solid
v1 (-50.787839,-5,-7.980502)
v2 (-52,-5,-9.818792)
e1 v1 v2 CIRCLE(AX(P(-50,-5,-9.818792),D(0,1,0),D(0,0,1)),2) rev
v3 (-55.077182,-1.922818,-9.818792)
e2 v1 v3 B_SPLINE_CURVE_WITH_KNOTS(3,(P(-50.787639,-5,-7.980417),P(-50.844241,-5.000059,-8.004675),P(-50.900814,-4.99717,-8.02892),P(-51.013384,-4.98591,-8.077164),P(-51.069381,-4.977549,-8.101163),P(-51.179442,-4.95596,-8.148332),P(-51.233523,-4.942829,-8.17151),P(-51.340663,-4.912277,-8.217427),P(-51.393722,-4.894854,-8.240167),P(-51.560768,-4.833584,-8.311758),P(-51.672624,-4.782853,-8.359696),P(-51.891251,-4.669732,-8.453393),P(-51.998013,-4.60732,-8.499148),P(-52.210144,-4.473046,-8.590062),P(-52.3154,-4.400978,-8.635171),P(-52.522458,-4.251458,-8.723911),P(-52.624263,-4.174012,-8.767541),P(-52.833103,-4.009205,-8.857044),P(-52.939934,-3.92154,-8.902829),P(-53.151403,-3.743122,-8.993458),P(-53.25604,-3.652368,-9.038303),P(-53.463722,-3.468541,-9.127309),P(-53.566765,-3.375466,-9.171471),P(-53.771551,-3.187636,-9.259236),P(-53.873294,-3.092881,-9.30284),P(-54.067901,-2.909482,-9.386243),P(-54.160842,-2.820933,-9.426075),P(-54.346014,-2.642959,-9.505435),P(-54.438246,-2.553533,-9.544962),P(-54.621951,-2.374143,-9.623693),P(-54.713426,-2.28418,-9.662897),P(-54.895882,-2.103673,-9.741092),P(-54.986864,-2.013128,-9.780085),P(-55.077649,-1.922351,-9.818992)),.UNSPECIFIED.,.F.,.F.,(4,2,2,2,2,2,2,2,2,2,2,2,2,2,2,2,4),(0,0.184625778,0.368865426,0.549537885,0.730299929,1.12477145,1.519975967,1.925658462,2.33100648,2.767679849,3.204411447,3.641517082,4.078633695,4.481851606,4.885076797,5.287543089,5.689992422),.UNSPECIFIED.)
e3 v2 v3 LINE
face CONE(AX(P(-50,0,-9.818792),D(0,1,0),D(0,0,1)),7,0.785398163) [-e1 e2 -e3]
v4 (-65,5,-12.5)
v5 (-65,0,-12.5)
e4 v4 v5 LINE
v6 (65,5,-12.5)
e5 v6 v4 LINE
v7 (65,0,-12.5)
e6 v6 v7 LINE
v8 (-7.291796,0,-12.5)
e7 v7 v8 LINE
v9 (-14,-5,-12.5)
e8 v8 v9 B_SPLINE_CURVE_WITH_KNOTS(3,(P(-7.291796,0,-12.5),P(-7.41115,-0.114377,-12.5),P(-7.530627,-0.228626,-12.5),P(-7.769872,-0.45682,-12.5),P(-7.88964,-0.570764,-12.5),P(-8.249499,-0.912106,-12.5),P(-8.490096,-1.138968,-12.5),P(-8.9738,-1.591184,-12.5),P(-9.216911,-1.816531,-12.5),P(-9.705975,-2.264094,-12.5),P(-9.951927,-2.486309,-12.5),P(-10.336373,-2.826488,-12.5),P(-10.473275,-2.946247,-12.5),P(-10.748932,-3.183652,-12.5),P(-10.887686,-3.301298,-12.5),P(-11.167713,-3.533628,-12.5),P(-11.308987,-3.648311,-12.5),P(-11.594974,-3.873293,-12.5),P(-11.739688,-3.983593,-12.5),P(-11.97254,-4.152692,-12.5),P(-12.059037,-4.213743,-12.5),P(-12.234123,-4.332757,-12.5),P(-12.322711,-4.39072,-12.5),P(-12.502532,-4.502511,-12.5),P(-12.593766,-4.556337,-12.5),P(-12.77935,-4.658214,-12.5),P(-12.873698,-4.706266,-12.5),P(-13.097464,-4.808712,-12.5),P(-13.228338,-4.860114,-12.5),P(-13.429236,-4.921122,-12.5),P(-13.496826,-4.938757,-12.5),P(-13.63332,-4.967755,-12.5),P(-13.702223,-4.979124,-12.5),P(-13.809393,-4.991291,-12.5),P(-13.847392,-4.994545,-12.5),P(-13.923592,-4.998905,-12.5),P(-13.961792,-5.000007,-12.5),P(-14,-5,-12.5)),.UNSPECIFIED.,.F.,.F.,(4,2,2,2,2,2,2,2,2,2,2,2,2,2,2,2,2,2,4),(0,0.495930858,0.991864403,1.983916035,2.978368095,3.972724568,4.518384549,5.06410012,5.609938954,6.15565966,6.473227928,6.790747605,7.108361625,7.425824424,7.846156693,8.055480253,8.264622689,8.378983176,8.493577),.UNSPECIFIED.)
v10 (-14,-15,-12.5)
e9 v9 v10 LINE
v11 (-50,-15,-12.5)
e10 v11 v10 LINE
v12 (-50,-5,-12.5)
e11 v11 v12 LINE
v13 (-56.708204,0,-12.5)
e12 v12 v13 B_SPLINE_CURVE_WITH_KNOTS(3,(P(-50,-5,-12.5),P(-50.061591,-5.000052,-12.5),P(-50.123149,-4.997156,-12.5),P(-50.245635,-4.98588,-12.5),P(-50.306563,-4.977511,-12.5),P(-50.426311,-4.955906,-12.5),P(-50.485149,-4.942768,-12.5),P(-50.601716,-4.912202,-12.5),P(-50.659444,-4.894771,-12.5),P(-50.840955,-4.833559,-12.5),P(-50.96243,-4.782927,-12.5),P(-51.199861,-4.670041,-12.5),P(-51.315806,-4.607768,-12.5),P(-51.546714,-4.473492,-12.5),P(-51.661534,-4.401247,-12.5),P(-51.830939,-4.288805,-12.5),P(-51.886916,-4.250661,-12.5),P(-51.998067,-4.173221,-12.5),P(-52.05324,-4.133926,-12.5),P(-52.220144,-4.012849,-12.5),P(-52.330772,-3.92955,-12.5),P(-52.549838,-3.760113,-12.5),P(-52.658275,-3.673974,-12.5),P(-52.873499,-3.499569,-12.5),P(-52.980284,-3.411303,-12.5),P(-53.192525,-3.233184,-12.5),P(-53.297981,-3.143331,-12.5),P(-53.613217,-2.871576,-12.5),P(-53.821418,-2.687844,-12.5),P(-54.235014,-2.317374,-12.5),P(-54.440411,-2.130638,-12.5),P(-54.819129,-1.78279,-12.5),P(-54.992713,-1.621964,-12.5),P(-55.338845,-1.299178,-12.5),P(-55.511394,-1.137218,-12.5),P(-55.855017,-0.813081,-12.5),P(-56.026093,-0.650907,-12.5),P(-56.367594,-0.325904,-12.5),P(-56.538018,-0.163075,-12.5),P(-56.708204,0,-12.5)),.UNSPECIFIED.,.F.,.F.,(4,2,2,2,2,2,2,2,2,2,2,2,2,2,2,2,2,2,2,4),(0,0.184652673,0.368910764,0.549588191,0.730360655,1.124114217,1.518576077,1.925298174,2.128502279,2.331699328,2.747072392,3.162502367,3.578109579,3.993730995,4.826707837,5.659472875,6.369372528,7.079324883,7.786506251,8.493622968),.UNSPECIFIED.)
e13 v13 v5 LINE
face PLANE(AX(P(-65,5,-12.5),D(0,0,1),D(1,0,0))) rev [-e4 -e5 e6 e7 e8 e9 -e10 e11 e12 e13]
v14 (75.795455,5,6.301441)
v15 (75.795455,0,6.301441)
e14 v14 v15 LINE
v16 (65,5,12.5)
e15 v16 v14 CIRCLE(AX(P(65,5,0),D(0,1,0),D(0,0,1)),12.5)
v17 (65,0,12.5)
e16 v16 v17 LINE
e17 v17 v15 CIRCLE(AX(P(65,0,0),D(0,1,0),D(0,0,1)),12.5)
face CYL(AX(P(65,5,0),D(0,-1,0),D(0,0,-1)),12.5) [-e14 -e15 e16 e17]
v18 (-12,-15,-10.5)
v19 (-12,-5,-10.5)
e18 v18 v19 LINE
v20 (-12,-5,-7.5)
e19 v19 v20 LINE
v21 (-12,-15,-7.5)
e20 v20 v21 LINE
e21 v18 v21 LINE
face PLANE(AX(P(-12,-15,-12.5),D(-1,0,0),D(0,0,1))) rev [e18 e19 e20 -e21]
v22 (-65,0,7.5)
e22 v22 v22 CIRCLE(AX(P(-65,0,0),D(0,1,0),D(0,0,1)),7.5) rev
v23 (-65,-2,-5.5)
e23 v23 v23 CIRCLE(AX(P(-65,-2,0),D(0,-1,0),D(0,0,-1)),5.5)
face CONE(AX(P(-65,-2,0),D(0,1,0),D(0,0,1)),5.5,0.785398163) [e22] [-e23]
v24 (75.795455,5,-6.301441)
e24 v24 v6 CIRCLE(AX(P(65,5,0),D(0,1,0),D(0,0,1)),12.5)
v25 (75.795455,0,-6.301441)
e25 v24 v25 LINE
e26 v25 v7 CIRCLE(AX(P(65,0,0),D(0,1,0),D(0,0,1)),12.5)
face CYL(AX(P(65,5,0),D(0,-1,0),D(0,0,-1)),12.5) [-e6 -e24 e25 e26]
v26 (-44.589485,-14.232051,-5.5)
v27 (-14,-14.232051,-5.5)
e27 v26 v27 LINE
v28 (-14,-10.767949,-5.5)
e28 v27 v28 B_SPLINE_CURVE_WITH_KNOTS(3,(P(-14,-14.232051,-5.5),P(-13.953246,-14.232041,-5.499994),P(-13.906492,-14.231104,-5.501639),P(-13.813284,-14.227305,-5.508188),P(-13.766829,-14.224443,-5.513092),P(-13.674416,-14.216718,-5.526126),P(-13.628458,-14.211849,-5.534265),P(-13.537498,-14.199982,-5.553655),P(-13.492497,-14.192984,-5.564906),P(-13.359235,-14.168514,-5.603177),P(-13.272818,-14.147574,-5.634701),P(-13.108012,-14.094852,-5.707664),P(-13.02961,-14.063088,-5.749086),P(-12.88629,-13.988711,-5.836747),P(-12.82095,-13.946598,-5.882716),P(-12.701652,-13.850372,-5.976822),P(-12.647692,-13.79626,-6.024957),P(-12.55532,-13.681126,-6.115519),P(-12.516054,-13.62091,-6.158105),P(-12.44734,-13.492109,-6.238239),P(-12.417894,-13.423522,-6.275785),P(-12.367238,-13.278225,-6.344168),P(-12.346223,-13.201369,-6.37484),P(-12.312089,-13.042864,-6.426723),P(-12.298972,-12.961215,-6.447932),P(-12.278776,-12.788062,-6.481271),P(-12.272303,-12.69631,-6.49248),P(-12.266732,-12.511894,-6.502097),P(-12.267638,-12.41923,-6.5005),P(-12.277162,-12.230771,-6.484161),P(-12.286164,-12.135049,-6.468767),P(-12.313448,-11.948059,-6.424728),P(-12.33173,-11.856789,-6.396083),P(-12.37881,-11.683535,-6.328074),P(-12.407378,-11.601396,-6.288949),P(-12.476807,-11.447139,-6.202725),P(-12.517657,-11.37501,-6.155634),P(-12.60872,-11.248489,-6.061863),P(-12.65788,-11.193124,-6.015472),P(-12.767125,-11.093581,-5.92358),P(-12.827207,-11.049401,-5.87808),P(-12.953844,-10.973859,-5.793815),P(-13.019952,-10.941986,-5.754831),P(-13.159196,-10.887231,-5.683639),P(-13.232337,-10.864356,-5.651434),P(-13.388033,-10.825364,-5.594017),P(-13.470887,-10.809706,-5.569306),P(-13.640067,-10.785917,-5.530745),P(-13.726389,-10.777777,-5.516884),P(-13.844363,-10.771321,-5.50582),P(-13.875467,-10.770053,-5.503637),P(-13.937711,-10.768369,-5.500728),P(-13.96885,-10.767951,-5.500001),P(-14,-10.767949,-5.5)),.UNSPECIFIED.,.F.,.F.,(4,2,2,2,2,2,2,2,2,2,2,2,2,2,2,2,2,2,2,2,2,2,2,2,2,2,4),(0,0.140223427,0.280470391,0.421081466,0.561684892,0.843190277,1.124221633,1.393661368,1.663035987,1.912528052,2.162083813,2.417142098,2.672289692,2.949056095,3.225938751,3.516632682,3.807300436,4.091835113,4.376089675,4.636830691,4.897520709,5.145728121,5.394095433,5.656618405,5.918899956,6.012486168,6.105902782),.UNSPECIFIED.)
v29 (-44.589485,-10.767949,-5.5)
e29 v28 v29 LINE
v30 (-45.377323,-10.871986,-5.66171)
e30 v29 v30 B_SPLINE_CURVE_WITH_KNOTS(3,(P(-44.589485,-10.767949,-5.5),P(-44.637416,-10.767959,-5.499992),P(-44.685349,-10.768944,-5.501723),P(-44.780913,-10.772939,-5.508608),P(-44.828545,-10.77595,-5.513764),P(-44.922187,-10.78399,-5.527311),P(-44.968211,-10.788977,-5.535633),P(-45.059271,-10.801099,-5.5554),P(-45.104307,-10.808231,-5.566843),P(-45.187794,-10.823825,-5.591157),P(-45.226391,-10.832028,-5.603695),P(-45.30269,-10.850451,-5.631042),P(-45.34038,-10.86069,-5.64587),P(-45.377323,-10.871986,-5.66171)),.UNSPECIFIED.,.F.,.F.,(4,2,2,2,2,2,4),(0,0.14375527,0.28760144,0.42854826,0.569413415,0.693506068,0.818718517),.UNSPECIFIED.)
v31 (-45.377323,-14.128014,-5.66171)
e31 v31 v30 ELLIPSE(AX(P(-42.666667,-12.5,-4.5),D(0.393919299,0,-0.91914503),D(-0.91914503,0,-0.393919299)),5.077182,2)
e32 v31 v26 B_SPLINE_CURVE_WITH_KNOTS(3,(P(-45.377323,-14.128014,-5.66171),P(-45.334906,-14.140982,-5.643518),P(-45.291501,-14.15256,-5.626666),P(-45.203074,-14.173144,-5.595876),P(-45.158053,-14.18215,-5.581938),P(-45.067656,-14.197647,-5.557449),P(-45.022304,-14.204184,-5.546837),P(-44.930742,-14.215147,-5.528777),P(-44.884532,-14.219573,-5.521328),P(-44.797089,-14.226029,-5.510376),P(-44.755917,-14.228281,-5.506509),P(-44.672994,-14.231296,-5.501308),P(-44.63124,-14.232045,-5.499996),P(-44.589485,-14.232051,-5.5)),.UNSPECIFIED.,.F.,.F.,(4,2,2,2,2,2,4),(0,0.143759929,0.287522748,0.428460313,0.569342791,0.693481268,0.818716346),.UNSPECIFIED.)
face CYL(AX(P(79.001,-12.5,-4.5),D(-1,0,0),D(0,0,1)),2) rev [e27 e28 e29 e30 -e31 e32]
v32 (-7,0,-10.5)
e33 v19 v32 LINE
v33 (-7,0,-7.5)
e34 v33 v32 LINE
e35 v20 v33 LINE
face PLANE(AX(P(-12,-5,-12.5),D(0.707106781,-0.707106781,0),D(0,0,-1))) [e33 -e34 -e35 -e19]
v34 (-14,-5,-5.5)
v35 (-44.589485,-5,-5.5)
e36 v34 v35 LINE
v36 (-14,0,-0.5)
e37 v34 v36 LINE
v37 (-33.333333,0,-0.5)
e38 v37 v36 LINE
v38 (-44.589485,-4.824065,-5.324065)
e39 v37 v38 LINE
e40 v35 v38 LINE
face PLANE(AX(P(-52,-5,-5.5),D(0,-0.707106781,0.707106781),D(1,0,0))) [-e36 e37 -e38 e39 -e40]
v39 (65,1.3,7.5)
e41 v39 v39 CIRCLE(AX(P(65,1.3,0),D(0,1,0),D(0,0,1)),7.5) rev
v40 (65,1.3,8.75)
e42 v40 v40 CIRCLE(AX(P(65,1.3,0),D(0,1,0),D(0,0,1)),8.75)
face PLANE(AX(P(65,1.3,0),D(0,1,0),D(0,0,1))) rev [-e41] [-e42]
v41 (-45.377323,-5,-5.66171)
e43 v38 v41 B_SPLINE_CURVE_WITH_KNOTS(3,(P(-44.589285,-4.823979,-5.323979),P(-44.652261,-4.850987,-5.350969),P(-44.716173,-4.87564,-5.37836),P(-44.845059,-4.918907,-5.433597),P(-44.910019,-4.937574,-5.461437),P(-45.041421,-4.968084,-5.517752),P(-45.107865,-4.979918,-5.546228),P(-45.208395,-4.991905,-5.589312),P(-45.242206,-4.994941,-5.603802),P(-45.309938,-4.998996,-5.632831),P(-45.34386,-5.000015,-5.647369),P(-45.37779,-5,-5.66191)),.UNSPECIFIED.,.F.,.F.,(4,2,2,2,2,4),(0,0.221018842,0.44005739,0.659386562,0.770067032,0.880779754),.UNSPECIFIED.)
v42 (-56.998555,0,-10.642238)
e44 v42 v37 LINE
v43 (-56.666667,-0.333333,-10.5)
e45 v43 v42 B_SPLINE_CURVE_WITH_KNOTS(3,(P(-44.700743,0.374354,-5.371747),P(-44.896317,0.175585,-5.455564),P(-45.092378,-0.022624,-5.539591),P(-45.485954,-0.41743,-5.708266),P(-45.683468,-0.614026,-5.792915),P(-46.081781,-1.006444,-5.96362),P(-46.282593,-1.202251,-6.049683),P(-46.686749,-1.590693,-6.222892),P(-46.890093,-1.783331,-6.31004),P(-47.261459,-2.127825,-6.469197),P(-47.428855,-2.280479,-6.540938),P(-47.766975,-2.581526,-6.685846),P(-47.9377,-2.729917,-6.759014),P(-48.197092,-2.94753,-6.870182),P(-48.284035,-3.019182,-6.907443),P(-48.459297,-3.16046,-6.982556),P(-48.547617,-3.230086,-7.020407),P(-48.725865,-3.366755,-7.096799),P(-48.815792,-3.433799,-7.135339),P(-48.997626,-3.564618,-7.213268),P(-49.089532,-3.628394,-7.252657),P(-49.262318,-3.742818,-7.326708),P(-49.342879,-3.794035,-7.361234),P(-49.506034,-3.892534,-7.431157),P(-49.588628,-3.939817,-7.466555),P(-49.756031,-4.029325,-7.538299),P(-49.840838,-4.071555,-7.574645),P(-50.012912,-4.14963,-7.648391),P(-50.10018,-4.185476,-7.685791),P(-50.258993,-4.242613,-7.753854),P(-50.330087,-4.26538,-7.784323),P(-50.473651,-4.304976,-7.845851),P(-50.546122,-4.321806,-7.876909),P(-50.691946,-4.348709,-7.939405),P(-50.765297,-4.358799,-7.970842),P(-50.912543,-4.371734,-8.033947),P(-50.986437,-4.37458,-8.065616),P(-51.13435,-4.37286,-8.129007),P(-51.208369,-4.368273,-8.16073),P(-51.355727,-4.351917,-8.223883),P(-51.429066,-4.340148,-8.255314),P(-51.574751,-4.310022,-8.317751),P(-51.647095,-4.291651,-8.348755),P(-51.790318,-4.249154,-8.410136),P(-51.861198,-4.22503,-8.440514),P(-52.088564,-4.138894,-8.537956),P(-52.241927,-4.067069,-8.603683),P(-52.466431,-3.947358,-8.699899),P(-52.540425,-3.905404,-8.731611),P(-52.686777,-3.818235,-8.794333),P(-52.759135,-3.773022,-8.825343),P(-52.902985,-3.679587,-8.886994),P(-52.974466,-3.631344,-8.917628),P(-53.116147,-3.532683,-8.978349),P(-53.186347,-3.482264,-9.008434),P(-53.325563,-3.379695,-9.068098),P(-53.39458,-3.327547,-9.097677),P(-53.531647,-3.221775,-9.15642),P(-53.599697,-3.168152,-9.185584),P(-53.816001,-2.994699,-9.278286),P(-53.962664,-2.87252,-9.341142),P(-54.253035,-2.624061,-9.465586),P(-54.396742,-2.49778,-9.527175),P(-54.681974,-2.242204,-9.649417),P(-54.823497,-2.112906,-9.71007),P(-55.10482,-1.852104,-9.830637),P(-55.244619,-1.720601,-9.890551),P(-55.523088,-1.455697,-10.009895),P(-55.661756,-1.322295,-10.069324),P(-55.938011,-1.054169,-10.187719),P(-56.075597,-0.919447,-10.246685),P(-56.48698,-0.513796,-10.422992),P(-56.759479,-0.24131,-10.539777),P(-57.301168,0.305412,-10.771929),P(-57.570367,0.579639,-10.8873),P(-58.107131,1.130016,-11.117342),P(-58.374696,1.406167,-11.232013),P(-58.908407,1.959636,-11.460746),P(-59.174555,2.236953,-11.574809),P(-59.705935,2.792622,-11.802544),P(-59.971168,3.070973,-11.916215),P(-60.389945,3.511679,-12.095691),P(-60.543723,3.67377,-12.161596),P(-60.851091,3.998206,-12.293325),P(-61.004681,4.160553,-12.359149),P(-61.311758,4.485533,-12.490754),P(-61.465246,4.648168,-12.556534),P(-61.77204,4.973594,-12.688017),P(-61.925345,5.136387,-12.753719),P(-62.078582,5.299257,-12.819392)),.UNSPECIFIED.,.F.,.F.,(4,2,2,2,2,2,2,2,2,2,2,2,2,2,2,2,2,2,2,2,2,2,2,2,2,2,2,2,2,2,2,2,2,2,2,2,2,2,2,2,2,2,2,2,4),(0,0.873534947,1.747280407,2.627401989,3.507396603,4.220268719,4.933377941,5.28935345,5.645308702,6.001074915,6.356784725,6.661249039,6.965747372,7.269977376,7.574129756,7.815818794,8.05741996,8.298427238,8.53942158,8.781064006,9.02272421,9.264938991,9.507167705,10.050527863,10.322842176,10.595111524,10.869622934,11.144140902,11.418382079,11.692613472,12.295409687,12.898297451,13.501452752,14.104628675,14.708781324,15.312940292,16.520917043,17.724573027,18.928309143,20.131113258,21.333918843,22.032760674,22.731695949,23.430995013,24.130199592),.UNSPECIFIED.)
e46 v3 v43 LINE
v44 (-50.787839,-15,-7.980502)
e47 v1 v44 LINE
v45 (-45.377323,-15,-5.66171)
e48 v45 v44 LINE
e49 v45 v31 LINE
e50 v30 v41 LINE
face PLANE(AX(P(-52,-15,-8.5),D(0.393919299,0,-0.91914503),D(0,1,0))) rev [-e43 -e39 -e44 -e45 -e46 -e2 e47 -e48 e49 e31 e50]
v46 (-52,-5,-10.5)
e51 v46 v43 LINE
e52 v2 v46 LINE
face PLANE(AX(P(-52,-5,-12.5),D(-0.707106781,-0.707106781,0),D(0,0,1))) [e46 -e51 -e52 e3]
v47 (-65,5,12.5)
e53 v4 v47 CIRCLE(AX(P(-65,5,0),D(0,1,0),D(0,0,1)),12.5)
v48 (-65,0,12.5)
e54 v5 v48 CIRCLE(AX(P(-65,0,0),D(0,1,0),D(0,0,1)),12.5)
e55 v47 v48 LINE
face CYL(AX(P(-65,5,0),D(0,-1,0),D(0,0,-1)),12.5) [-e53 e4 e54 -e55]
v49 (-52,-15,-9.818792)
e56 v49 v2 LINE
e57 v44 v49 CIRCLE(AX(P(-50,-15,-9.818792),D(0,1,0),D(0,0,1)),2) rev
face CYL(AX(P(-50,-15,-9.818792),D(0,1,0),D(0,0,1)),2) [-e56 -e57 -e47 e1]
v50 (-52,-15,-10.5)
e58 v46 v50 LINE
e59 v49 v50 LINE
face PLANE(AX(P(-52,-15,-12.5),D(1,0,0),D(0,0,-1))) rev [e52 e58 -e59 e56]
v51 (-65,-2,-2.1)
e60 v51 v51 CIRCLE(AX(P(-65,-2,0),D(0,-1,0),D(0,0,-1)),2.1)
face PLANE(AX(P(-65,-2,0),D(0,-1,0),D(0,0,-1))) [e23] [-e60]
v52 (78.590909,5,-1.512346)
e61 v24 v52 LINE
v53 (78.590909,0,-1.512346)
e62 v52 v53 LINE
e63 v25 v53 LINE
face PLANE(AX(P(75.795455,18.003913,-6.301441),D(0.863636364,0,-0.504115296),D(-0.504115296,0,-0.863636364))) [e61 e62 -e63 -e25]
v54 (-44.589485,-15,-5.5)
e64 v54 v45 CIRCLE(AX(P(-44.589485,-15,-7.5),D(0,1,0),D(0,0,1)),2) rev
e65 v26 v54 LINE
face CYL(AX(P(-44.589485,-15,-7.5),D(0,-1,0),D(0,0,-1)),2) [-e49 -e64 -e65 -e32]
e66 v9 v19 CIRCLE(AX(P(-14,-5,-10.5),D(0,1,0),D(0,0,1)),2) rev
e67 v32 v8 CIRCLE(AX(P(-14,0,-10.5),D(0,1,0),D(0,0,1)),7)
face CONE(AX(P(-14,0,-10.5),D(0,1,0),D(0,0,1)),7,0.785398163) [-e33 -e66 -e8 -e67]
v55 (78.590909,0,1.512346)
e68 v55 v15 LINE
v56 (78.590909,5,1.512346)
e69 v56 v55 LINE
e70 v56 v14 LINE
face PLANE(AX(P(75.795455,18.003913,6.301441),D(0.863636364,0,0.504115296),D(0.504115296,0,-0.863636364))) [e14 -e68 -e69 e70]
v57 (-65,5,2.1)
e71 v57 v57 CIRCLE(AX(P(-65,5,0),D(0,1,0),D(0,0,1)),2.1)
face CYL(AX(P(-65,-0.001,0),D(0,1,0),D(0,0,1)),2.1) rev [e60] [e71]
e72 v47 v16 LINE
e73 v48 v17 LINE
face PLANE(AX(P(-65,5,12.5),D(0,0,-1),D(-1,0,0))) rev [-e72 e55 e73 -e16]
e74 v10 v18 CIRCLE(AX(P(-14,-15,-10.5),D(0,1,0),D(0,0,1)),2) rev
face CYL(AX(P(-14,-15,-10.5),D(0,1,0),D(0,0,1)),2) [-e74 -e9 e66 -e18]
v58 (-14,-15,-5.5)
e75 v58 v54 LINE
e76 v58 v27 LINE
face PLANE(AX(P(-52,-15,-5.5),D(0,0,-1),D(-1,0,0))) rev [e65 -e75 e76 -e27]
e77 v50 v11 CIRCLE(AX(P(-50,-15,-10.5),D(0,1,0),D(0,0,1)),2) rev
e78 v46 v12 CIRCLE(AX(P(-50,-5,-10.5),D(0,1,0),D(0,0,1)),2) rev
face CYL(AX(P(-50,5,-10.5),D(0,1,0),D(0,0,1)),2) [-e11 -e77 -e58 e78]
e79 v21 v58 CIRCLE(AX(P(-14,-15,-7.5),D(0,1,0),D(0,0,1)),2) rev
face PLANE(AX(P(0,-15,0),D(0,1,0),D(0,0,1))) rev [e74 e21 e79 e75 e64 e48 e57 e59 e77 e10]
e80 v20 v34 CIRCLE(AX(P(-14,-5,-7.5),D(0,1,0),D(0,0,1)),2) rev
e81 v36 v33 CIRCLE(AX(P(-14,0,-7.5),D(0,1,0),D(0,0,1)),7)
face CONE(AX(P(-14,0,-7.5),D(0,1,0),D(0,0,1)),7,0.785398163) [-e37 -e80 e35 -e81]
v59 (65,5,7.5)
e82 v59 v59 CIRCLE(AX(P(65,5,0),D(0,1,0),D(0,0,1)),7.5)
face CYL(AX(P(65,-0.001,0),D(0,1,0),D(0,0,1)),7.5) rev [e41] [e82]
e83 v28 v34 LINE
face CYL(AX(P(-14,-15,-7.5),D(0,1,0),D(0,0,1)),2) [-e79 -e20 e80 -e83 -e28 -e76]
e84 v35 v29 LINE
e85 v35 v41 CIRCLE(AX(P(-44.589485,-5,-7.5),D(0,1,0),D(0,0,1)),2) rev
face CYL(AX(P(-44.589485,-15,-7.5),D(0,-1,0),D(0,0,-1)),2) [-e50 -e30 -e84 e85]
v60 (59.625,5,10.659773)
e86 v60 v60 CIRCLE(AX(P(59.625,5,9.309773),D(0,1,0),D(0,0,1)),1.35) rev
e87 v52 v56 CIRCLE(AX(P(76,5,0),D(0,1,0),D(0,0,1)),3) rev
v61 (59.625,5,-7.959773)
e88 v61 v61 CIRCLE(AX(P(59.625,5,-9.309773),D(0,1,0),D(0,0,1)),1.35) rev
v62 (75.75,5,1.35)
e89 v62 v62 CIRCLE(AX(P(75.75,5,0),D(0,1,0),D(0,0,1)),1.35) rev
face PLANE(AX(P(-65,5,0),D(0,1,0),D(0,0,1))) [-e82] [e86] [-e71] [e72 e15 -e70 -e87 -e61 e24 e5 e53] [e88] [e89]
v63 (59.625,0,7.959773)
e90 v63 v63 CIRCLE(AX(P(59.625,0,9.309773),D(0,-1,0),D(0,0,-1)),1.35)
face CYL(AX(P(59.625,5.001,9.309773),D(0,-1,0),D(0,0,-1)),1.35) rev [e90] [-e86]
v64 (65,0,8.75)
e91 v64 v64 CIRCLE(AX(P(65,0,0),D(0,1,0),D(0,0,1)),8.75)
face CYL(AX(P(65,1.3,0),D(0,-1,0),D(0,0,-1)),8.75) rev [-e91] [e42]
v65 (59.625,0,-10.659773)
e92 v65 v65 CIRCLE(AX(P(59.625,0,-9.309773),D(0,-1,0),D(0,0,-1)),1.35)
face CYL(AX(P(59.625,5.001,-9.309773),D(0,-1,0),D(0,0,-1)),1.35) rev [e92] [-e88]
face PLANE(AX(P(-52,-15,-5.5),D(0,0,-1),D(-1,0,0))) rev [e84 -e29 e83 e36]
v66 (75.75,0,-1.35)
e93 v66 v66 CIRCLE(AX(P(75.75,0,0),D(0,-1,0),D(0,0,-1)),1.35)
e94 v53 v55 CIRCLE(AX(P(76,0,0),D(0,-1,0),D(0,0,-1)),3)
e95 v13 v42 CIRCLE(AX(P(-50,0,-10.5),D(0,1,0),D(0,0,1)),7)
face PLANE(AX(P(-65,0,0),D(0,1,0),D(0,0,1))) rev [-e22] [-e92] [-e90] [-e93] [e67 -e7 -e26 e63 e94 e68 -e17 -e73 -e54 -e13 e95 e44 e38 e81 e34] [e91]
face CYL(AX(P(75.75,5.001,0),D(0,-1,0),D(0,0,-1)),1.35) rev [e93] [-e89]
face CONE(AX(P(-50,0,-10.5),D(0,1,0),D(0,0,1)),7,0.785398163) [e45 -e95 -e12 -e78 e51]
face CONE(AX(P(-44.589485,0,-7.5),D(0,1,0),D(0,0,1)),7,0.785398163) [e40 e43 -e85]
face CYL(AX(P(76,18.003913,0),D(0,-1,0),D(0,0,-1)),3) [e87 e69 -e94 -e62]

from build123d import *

# Parameters (mm, degrees)
EXTRUDE_1_DEPTH     = 5
EXTRUDE_5_DEPTH     = 5
CUT_EXTRUDE_2_REACH = 82.139
SKETCH_7_R          = 7.5
SKETCH_8_R          = 8.75
CUT_EXTRUDE_3_DEPTH = 1.3
CUT_EXTRUDE_4_REACH = 82.139
SKETCH_9_R          = 1.35
CUT_EXTRUDE_5_REACH = 82.139
SKETCH_12_R         = 2.1
SKETCH_14_W         = 40
SKETCH_14_H         = 7
EXTRUDE_6_DEPTH     = 15
CHAMFER_1_SIZE      = 7
CHAMFER_1_SIZE2     = 3
CUT_EXTRUDE_6_REACH = 134.447
SKETCH_15_R         = 2
FILLET_3_R          = 2
CHAMFER_2_SIZE      = 5
CUT_EXTRUDE_7_DEPTH = 15
SKETCH_17_R         = 7.5
SKETCH_17_R_2       = 2.1
EXTRUDE_7_DEPTH     = 2
CHAMFER_3_SIZE      = 2


# Some blends are built 0.0001 mm under size
with BuildPart() as part:
    # 草图1 → 凸台-拉伸1 (new body)
    with BuildSketch(Plane(origin=(0, 0, 0), x_dir=(1, 0, 0), z_dir=(0, 1, 0))):
        with BuildLine():
            Line((-65, 12.5), (65, 12.5))
            ThreePointArc((65, 12.5), (77.5, 0), (65, -12.5))
            Line((65, -12.5), (-65, -12.5))
            ThreePointArc((-65, -12.5), (-77.5, 0), (-65, 12.5))
        make_face()
    extrude(amount=EXTRUDE_1_DEPTH)

    # 草图10 → 凸台-拉伸5 (add)
    with BuildSketch(Plane.XZ):
        with BuildLine():
            Line((75.795454545, -6.301441197), (78.590909091, -1.512345887))
            ThreePointArc((78.590909091, -1.512345887), (79, 0), (78.590909091, 1.512345887))
            Line((78.590909091, 1.512345887), (75.795454545, 6.301441197))
            Line((75.795454545, 6.301441197), (75.795454545, -6.301441197))
        make_face()
    extrude(amount=-EXTRUDE_5_DEPTH)

    # 草图7 → 切除-拉伸2 (cut, up to next)
    with BuildSketch(Plane(origin=(0, 5, 0), x_dir=(1, 0, 0), z_dir=(0, 1, 0)), mode=Mode.PRIVATE) as cut_extrude_2_sk1:
        with Locations(Location((65, 0, 0), (0, 0, 270))):
            Circle(SKETCH_7_R)
    cut_extrude_2_tool1 = extrude(cut_extrude_2_sk1.sketch, amount=-CUT_EXTRUDE_2_REACH, mode=Mode.PRIVATE) & part.part
    add(cut_extrude_2_tool1.solids().sort_by_distance((65, 5, 0))[0], mode=Mode.SUBTRACT)

    # 草图8 → 切除-拉伸3 (cut)
    with BuildSketch(Plane(origin=(0, 0, 0), x_dir=(1, 0, 0), z_dir=(0, 1, 0))):
        with Locations(Location((65, 0, 0), (0, 0, 270))):
            Circle(SKETCH_8_R)
    extrude(amount=CUT_EXTRUDE_3_DEPTH, mode=Mode.SUBTRACT)

    # 草图9 → 切除-拉伸4 (cut, up to next)
    with BuildSketch(Plane.XZ, mode=Mode.PRIVATE) as cut_extrude_4_sk1:
        with Locations(Location((59.625, 9.309773091, 0), (0, 0, 270))):
            Circle(SKETCH_9_R)
    cut_extrude_4_tool1 = extrude(cut_extrude_4_sk1.sketch, amount=-CUT_EXTRUDE_4_REACH, mode=Mode.PRIVATE) & part.part
    # 草图9 → 切除-拉伸4 (cut, up to next)
    with BuildSketch(Plane.XZ, mode=Mode.PRIVATE) as cut_extrude_4_sk2:
        with Locations(Location((75.75, 0, 0), (0, 0, 270))):
            Circle(SKETCH_9_R)
    cut_extrude_4_tool2 = extrude(cut_extrude_4_sk2.sketch, amount=-CUT_EXTRUDE_4_REACH, mode=Mode.PRIVATE) & part.part
    # 草图9 → 切除-拉伸4 (cut, up to next)
    with BuildSketch(Plane.XZ, mode=Mode.PRIVATE) as cut_extrude_4_sk3:
        with Locations(Location((59.625, -9.309773091, 0), (0, 0, 270))):
            Circle(SKETCH_9_R)
    cut_extrude_4_tool3 = extrude(cut_extrude_4_sk3.sketch, amount=-CUT_EXTRUDE_4_REACH, mode=Mode.PRIVATE) & part.part
    add(cut_extrude_4_tool1.solids().sort_by_distance((59.625, 0, 9.309773))[0], mode=Mode.SUBTRACT)
    add(cut_extrude_4_tool2.solids().sort_by_distance((75.75, 0, 0))[0], mode=Mode.SUBTRACT)
    add(cut_extrude_4_tool3.solids().sort_by_distance((59.625, 0, -9.309773))[0], mode=Mode.SUBTRACT)

    # 草图12 → 切除-拉伸5 (cut, up to next)
    with BuildSketch(Plane(origin=(0, 5, 0), x_dir=(1, 0, 0), z_dir=(0, 1, 0)), mode=Mode.PRIVATE) as cut_extrude_5_sk1:
        with Locations(Location((-65, 0, 0), (0, 0, 270))):
            Circle(SKETCH_12_R)
    cut_extrude_5_tool1 = extrude(cut_extrude_5_sk1.sketch, amount=-CUT_EXTRUDE_5_REACH, mode=Mode.PRIVATE) & part.part
    add(cut_extrude_5_tool1.solids().sort_by_distance((-65, 5, 0))[0], mode=Mode.SUBTRACT)

    # 草图14 → 凸台-拉伸6 (add)
    with BuildSketch(Plane.XZ):
        with Locations((-32, -9)):
            Rectangle(SKETCH_14_W, SKETCH_14_H)
    extrude(amount=EXTRUDE_6_DEPTH)

    # 倒角1
    chamfer_1_edges = [part.edges().sort_by_distance(p)[0] for p in [
        (-52, -7.5, -5.5),
    ]]
    chamfer_1_side = [part.faces().sort_by_distance(p)[0] for p in [
        (-32, -7.5, -5.5),
    ]]
    chamfer(chamfer_1_edges, length=CHAMFER_1_SIZE, length2=CHAMFER_1_SIZE2, reference=chamfer_1_side[0])

    # 草图15 → 切除-拉伸6 (cut, up to next)
    with BuildSketch(Plane.ZY.offset(52), mode=Mode.PRIVATE) as cut_extrude_6_sk1:
        with Locations((-4.5, -12.5)):
            Circle(SKETCH_15_R)
    cut_extrude_6_tool1 = extrude(cut_extrude_6_sk1.sketch, amount=-CUT_EXTRUDE_6_REACH, mode=Mode.PRIVATE) & part.part
    add(cut_extrude_6_tool1.solids().sort_by_distance((-52, -12.5, -4.5))[0], mode=Mode.SUBTRACT)

    # 圆角3
    # the kernel refuses this fillet: 2 mm, written as the material it takes off along each edge
    with BuildSketch(Plane(origin=(-52, 0, -8.5), x_dir=(0.9191450300180579, 0, 0.39391929857916774), z_dir=(0, -1, 0))) as fillet_3_piece_1:
        with BuildLine():
            CenterArc((FILLET_3_R * 0.659396157981, -FILLET_3_R), FILLET_3_R, 90, 66.801409486)
            Line((-FILLET_3_R * 0.259748872037, -FILLET_3_R * 0.606080701421), (0, 0))
            Line((0, 0), (FILLET_3_R * 0.659396157981, 0))
        make_face()
    extrude(amount=18.29698079, mode=Mode.SUBTRACT)
    with BuildSketch(Plane(origin=(-52, 0, -12.5), x_dir=(0, 0, 1), z_dir=(0, -1, 0))) as fillet_3_piece_2:
        with BuildLine():
            CenterArc((FILLET_3_R, -FILLET_3_R), FILLET_3_R, 90, 90)
            Line((0, -FILLET_3_R), (0, 0))
            Line((0, 0), (FILLET_3_R, 0))
        make_face()
    extrude(amount=20, mode=Mode.SUBTRACT)
    with BuildSketch(Plane(origin=(-45, -13.205762298, -5.5), x_dir=(-0.9191450300180575, 0, -0.3939192985791687), z_dir=(0, -1, 0))) as fillet_3_piece_3:
        with BuildLine():
            CenterArc((FILLET_3_R * 0.205257701955, FILLET_3_R), FILLET_3_R, 246.801409486, 23.198590514)
            Line((-FILLET_3_R * 0.188661596625, FILLET_3_R * 0.0808549699819), (0, 0))
            Line((0, 0), (FILLET_3_R * 0.205257701955, 0))
        make_face()
    extrude(amount=2.820526212, mode=Mode.SUBTRACT)
    with BuildSketch(Plane(origin=(-45, 0, -5.5), x_dir=(1, 0, 0), z_dir=(0, -1, 0))) as fillet_3_piece_4:
        with BuildLine():
            CenterArc((FILLET_3_R * 0.205257701955, -FILLET_3_R), FILLET_3_R, 90, 23.198590514)
            Line((-FILLET_3_R * 0.188661596625, -FILLET_3_R * 0.0808549699819), (0, 0))
            Line((0, 0), (FILLET_3_R * 0.205257701955, 0))
        make_face()
    extrude(amount=11.794237702, mode=Mode.SUBTRACT)
    with BuildSketch(Plane(origin=(-12, 0, -5.5), x_dir=(-1, 0, 0), z_dir=(0, -1, 0))) as fillet_3_piece_5:
        with BuildLine():
            CenterArc((FILLET_3_R, FILLET_3_R), FILLET_3_R, 180, 90)
            Line((0, FILLET_3_R), (0, 0))
            Line((0, 0), (FILLET_3_R, 0))
        make_face()
    extrude(amount=15.767949192, mode=Mode.SUBTRACT)
    with BuildSketch(Plane(origin=(-12, -9.232050808, -5.5), x_dir=(0, 0, -1), z_dir=(0, -1, 0))) as fillet_3_piece_6:
        with BuildLine():
            CenterArc((FILLET_3_R, -FILLET_3_R), FILLET_3_R, 90, 90)
            Line((0, -FILLET_3_R), (0, 0))
            Line((0, 0), (FILLET_3_R, 0))
        make_face()
    extrude(amount=10.767949192, mode=Mode.SUBTRACT)
    with BuildSketch(Plane(origin=(-12, 0, -12.5), x_dir=(0, 0, 1), z_dir=(0, -1, 0))) as fillet_3_piece_7:
        with BuildLine():
            CenterArc((FILLET_3_R, FILLET_3_R), FILLET_3_R, 180, 90)
            Line((0, FILLET_3_R), (0, 0))
            Line((0, 0), (FILLET_3_R, 0))
        make_face()
    extrude(amount=20, mode=Mode.SUBTRACT)

    # 倒角2
    chamfer_2_edges = [part.edges().sort_by_distance(p)[0] for p in [
        (-29.294742298, 0, -5.5),
        (-12, 0, -9),
        (-51.669682184, 0, -8.717810298),
        (-51.414213562, 0, -11.914213562),
        (-44.991616341, 0, -5.540844554),
        (-12.585786438, 0, -6.085786438),
        (-12.585786438, 0, -11.914213562),
        (-52, 0, -10.159396158),
        (-48.082580895, 0, -6.821106098),
    ]]
    chamfer(chamfer_2_edges, length=CHAMFER_2_SIZE)

    # 草图16 → 切除-拉伸7 (cut)
    with BuildSketch(Plane.XZ.offset(15)):
        Polygon((-61.333333333, -12.5), (-33.333333333, -0.5), (-61.333333333, -0.5), align=None)
    extrude(amount=-CUT_EXTRUDE_7_DEPTH, mode=Mode.SUBTRACT)

    # 草图17 → 凸台-拉伸7 (add)
    with BuildSketch(Plane.XZ):
        with Locations(Location((-65, 0, 0), (0, 0, 90))):
            Circle(SKETCH_17_R)
        with Locations(Location((-65, 0, 0), (0, 0, 90))):
            Circle(SKETCH_17_R_2, mode=Mode.SUBTRACT)
    extrude(amount=EXTRUDE_7_DEPTH)

    # 倒角3
    chamfer_3_edges = [part.edges().sort_by_distance(p)[0] for p in [
        (-65, -2, -7.5),
    ]]
    chamfer(chamfer_3_edges, length=CHAMFER_3_SIZE - 0.0001)  # a hair under: the kernel refuses the full size


solid = part.part
